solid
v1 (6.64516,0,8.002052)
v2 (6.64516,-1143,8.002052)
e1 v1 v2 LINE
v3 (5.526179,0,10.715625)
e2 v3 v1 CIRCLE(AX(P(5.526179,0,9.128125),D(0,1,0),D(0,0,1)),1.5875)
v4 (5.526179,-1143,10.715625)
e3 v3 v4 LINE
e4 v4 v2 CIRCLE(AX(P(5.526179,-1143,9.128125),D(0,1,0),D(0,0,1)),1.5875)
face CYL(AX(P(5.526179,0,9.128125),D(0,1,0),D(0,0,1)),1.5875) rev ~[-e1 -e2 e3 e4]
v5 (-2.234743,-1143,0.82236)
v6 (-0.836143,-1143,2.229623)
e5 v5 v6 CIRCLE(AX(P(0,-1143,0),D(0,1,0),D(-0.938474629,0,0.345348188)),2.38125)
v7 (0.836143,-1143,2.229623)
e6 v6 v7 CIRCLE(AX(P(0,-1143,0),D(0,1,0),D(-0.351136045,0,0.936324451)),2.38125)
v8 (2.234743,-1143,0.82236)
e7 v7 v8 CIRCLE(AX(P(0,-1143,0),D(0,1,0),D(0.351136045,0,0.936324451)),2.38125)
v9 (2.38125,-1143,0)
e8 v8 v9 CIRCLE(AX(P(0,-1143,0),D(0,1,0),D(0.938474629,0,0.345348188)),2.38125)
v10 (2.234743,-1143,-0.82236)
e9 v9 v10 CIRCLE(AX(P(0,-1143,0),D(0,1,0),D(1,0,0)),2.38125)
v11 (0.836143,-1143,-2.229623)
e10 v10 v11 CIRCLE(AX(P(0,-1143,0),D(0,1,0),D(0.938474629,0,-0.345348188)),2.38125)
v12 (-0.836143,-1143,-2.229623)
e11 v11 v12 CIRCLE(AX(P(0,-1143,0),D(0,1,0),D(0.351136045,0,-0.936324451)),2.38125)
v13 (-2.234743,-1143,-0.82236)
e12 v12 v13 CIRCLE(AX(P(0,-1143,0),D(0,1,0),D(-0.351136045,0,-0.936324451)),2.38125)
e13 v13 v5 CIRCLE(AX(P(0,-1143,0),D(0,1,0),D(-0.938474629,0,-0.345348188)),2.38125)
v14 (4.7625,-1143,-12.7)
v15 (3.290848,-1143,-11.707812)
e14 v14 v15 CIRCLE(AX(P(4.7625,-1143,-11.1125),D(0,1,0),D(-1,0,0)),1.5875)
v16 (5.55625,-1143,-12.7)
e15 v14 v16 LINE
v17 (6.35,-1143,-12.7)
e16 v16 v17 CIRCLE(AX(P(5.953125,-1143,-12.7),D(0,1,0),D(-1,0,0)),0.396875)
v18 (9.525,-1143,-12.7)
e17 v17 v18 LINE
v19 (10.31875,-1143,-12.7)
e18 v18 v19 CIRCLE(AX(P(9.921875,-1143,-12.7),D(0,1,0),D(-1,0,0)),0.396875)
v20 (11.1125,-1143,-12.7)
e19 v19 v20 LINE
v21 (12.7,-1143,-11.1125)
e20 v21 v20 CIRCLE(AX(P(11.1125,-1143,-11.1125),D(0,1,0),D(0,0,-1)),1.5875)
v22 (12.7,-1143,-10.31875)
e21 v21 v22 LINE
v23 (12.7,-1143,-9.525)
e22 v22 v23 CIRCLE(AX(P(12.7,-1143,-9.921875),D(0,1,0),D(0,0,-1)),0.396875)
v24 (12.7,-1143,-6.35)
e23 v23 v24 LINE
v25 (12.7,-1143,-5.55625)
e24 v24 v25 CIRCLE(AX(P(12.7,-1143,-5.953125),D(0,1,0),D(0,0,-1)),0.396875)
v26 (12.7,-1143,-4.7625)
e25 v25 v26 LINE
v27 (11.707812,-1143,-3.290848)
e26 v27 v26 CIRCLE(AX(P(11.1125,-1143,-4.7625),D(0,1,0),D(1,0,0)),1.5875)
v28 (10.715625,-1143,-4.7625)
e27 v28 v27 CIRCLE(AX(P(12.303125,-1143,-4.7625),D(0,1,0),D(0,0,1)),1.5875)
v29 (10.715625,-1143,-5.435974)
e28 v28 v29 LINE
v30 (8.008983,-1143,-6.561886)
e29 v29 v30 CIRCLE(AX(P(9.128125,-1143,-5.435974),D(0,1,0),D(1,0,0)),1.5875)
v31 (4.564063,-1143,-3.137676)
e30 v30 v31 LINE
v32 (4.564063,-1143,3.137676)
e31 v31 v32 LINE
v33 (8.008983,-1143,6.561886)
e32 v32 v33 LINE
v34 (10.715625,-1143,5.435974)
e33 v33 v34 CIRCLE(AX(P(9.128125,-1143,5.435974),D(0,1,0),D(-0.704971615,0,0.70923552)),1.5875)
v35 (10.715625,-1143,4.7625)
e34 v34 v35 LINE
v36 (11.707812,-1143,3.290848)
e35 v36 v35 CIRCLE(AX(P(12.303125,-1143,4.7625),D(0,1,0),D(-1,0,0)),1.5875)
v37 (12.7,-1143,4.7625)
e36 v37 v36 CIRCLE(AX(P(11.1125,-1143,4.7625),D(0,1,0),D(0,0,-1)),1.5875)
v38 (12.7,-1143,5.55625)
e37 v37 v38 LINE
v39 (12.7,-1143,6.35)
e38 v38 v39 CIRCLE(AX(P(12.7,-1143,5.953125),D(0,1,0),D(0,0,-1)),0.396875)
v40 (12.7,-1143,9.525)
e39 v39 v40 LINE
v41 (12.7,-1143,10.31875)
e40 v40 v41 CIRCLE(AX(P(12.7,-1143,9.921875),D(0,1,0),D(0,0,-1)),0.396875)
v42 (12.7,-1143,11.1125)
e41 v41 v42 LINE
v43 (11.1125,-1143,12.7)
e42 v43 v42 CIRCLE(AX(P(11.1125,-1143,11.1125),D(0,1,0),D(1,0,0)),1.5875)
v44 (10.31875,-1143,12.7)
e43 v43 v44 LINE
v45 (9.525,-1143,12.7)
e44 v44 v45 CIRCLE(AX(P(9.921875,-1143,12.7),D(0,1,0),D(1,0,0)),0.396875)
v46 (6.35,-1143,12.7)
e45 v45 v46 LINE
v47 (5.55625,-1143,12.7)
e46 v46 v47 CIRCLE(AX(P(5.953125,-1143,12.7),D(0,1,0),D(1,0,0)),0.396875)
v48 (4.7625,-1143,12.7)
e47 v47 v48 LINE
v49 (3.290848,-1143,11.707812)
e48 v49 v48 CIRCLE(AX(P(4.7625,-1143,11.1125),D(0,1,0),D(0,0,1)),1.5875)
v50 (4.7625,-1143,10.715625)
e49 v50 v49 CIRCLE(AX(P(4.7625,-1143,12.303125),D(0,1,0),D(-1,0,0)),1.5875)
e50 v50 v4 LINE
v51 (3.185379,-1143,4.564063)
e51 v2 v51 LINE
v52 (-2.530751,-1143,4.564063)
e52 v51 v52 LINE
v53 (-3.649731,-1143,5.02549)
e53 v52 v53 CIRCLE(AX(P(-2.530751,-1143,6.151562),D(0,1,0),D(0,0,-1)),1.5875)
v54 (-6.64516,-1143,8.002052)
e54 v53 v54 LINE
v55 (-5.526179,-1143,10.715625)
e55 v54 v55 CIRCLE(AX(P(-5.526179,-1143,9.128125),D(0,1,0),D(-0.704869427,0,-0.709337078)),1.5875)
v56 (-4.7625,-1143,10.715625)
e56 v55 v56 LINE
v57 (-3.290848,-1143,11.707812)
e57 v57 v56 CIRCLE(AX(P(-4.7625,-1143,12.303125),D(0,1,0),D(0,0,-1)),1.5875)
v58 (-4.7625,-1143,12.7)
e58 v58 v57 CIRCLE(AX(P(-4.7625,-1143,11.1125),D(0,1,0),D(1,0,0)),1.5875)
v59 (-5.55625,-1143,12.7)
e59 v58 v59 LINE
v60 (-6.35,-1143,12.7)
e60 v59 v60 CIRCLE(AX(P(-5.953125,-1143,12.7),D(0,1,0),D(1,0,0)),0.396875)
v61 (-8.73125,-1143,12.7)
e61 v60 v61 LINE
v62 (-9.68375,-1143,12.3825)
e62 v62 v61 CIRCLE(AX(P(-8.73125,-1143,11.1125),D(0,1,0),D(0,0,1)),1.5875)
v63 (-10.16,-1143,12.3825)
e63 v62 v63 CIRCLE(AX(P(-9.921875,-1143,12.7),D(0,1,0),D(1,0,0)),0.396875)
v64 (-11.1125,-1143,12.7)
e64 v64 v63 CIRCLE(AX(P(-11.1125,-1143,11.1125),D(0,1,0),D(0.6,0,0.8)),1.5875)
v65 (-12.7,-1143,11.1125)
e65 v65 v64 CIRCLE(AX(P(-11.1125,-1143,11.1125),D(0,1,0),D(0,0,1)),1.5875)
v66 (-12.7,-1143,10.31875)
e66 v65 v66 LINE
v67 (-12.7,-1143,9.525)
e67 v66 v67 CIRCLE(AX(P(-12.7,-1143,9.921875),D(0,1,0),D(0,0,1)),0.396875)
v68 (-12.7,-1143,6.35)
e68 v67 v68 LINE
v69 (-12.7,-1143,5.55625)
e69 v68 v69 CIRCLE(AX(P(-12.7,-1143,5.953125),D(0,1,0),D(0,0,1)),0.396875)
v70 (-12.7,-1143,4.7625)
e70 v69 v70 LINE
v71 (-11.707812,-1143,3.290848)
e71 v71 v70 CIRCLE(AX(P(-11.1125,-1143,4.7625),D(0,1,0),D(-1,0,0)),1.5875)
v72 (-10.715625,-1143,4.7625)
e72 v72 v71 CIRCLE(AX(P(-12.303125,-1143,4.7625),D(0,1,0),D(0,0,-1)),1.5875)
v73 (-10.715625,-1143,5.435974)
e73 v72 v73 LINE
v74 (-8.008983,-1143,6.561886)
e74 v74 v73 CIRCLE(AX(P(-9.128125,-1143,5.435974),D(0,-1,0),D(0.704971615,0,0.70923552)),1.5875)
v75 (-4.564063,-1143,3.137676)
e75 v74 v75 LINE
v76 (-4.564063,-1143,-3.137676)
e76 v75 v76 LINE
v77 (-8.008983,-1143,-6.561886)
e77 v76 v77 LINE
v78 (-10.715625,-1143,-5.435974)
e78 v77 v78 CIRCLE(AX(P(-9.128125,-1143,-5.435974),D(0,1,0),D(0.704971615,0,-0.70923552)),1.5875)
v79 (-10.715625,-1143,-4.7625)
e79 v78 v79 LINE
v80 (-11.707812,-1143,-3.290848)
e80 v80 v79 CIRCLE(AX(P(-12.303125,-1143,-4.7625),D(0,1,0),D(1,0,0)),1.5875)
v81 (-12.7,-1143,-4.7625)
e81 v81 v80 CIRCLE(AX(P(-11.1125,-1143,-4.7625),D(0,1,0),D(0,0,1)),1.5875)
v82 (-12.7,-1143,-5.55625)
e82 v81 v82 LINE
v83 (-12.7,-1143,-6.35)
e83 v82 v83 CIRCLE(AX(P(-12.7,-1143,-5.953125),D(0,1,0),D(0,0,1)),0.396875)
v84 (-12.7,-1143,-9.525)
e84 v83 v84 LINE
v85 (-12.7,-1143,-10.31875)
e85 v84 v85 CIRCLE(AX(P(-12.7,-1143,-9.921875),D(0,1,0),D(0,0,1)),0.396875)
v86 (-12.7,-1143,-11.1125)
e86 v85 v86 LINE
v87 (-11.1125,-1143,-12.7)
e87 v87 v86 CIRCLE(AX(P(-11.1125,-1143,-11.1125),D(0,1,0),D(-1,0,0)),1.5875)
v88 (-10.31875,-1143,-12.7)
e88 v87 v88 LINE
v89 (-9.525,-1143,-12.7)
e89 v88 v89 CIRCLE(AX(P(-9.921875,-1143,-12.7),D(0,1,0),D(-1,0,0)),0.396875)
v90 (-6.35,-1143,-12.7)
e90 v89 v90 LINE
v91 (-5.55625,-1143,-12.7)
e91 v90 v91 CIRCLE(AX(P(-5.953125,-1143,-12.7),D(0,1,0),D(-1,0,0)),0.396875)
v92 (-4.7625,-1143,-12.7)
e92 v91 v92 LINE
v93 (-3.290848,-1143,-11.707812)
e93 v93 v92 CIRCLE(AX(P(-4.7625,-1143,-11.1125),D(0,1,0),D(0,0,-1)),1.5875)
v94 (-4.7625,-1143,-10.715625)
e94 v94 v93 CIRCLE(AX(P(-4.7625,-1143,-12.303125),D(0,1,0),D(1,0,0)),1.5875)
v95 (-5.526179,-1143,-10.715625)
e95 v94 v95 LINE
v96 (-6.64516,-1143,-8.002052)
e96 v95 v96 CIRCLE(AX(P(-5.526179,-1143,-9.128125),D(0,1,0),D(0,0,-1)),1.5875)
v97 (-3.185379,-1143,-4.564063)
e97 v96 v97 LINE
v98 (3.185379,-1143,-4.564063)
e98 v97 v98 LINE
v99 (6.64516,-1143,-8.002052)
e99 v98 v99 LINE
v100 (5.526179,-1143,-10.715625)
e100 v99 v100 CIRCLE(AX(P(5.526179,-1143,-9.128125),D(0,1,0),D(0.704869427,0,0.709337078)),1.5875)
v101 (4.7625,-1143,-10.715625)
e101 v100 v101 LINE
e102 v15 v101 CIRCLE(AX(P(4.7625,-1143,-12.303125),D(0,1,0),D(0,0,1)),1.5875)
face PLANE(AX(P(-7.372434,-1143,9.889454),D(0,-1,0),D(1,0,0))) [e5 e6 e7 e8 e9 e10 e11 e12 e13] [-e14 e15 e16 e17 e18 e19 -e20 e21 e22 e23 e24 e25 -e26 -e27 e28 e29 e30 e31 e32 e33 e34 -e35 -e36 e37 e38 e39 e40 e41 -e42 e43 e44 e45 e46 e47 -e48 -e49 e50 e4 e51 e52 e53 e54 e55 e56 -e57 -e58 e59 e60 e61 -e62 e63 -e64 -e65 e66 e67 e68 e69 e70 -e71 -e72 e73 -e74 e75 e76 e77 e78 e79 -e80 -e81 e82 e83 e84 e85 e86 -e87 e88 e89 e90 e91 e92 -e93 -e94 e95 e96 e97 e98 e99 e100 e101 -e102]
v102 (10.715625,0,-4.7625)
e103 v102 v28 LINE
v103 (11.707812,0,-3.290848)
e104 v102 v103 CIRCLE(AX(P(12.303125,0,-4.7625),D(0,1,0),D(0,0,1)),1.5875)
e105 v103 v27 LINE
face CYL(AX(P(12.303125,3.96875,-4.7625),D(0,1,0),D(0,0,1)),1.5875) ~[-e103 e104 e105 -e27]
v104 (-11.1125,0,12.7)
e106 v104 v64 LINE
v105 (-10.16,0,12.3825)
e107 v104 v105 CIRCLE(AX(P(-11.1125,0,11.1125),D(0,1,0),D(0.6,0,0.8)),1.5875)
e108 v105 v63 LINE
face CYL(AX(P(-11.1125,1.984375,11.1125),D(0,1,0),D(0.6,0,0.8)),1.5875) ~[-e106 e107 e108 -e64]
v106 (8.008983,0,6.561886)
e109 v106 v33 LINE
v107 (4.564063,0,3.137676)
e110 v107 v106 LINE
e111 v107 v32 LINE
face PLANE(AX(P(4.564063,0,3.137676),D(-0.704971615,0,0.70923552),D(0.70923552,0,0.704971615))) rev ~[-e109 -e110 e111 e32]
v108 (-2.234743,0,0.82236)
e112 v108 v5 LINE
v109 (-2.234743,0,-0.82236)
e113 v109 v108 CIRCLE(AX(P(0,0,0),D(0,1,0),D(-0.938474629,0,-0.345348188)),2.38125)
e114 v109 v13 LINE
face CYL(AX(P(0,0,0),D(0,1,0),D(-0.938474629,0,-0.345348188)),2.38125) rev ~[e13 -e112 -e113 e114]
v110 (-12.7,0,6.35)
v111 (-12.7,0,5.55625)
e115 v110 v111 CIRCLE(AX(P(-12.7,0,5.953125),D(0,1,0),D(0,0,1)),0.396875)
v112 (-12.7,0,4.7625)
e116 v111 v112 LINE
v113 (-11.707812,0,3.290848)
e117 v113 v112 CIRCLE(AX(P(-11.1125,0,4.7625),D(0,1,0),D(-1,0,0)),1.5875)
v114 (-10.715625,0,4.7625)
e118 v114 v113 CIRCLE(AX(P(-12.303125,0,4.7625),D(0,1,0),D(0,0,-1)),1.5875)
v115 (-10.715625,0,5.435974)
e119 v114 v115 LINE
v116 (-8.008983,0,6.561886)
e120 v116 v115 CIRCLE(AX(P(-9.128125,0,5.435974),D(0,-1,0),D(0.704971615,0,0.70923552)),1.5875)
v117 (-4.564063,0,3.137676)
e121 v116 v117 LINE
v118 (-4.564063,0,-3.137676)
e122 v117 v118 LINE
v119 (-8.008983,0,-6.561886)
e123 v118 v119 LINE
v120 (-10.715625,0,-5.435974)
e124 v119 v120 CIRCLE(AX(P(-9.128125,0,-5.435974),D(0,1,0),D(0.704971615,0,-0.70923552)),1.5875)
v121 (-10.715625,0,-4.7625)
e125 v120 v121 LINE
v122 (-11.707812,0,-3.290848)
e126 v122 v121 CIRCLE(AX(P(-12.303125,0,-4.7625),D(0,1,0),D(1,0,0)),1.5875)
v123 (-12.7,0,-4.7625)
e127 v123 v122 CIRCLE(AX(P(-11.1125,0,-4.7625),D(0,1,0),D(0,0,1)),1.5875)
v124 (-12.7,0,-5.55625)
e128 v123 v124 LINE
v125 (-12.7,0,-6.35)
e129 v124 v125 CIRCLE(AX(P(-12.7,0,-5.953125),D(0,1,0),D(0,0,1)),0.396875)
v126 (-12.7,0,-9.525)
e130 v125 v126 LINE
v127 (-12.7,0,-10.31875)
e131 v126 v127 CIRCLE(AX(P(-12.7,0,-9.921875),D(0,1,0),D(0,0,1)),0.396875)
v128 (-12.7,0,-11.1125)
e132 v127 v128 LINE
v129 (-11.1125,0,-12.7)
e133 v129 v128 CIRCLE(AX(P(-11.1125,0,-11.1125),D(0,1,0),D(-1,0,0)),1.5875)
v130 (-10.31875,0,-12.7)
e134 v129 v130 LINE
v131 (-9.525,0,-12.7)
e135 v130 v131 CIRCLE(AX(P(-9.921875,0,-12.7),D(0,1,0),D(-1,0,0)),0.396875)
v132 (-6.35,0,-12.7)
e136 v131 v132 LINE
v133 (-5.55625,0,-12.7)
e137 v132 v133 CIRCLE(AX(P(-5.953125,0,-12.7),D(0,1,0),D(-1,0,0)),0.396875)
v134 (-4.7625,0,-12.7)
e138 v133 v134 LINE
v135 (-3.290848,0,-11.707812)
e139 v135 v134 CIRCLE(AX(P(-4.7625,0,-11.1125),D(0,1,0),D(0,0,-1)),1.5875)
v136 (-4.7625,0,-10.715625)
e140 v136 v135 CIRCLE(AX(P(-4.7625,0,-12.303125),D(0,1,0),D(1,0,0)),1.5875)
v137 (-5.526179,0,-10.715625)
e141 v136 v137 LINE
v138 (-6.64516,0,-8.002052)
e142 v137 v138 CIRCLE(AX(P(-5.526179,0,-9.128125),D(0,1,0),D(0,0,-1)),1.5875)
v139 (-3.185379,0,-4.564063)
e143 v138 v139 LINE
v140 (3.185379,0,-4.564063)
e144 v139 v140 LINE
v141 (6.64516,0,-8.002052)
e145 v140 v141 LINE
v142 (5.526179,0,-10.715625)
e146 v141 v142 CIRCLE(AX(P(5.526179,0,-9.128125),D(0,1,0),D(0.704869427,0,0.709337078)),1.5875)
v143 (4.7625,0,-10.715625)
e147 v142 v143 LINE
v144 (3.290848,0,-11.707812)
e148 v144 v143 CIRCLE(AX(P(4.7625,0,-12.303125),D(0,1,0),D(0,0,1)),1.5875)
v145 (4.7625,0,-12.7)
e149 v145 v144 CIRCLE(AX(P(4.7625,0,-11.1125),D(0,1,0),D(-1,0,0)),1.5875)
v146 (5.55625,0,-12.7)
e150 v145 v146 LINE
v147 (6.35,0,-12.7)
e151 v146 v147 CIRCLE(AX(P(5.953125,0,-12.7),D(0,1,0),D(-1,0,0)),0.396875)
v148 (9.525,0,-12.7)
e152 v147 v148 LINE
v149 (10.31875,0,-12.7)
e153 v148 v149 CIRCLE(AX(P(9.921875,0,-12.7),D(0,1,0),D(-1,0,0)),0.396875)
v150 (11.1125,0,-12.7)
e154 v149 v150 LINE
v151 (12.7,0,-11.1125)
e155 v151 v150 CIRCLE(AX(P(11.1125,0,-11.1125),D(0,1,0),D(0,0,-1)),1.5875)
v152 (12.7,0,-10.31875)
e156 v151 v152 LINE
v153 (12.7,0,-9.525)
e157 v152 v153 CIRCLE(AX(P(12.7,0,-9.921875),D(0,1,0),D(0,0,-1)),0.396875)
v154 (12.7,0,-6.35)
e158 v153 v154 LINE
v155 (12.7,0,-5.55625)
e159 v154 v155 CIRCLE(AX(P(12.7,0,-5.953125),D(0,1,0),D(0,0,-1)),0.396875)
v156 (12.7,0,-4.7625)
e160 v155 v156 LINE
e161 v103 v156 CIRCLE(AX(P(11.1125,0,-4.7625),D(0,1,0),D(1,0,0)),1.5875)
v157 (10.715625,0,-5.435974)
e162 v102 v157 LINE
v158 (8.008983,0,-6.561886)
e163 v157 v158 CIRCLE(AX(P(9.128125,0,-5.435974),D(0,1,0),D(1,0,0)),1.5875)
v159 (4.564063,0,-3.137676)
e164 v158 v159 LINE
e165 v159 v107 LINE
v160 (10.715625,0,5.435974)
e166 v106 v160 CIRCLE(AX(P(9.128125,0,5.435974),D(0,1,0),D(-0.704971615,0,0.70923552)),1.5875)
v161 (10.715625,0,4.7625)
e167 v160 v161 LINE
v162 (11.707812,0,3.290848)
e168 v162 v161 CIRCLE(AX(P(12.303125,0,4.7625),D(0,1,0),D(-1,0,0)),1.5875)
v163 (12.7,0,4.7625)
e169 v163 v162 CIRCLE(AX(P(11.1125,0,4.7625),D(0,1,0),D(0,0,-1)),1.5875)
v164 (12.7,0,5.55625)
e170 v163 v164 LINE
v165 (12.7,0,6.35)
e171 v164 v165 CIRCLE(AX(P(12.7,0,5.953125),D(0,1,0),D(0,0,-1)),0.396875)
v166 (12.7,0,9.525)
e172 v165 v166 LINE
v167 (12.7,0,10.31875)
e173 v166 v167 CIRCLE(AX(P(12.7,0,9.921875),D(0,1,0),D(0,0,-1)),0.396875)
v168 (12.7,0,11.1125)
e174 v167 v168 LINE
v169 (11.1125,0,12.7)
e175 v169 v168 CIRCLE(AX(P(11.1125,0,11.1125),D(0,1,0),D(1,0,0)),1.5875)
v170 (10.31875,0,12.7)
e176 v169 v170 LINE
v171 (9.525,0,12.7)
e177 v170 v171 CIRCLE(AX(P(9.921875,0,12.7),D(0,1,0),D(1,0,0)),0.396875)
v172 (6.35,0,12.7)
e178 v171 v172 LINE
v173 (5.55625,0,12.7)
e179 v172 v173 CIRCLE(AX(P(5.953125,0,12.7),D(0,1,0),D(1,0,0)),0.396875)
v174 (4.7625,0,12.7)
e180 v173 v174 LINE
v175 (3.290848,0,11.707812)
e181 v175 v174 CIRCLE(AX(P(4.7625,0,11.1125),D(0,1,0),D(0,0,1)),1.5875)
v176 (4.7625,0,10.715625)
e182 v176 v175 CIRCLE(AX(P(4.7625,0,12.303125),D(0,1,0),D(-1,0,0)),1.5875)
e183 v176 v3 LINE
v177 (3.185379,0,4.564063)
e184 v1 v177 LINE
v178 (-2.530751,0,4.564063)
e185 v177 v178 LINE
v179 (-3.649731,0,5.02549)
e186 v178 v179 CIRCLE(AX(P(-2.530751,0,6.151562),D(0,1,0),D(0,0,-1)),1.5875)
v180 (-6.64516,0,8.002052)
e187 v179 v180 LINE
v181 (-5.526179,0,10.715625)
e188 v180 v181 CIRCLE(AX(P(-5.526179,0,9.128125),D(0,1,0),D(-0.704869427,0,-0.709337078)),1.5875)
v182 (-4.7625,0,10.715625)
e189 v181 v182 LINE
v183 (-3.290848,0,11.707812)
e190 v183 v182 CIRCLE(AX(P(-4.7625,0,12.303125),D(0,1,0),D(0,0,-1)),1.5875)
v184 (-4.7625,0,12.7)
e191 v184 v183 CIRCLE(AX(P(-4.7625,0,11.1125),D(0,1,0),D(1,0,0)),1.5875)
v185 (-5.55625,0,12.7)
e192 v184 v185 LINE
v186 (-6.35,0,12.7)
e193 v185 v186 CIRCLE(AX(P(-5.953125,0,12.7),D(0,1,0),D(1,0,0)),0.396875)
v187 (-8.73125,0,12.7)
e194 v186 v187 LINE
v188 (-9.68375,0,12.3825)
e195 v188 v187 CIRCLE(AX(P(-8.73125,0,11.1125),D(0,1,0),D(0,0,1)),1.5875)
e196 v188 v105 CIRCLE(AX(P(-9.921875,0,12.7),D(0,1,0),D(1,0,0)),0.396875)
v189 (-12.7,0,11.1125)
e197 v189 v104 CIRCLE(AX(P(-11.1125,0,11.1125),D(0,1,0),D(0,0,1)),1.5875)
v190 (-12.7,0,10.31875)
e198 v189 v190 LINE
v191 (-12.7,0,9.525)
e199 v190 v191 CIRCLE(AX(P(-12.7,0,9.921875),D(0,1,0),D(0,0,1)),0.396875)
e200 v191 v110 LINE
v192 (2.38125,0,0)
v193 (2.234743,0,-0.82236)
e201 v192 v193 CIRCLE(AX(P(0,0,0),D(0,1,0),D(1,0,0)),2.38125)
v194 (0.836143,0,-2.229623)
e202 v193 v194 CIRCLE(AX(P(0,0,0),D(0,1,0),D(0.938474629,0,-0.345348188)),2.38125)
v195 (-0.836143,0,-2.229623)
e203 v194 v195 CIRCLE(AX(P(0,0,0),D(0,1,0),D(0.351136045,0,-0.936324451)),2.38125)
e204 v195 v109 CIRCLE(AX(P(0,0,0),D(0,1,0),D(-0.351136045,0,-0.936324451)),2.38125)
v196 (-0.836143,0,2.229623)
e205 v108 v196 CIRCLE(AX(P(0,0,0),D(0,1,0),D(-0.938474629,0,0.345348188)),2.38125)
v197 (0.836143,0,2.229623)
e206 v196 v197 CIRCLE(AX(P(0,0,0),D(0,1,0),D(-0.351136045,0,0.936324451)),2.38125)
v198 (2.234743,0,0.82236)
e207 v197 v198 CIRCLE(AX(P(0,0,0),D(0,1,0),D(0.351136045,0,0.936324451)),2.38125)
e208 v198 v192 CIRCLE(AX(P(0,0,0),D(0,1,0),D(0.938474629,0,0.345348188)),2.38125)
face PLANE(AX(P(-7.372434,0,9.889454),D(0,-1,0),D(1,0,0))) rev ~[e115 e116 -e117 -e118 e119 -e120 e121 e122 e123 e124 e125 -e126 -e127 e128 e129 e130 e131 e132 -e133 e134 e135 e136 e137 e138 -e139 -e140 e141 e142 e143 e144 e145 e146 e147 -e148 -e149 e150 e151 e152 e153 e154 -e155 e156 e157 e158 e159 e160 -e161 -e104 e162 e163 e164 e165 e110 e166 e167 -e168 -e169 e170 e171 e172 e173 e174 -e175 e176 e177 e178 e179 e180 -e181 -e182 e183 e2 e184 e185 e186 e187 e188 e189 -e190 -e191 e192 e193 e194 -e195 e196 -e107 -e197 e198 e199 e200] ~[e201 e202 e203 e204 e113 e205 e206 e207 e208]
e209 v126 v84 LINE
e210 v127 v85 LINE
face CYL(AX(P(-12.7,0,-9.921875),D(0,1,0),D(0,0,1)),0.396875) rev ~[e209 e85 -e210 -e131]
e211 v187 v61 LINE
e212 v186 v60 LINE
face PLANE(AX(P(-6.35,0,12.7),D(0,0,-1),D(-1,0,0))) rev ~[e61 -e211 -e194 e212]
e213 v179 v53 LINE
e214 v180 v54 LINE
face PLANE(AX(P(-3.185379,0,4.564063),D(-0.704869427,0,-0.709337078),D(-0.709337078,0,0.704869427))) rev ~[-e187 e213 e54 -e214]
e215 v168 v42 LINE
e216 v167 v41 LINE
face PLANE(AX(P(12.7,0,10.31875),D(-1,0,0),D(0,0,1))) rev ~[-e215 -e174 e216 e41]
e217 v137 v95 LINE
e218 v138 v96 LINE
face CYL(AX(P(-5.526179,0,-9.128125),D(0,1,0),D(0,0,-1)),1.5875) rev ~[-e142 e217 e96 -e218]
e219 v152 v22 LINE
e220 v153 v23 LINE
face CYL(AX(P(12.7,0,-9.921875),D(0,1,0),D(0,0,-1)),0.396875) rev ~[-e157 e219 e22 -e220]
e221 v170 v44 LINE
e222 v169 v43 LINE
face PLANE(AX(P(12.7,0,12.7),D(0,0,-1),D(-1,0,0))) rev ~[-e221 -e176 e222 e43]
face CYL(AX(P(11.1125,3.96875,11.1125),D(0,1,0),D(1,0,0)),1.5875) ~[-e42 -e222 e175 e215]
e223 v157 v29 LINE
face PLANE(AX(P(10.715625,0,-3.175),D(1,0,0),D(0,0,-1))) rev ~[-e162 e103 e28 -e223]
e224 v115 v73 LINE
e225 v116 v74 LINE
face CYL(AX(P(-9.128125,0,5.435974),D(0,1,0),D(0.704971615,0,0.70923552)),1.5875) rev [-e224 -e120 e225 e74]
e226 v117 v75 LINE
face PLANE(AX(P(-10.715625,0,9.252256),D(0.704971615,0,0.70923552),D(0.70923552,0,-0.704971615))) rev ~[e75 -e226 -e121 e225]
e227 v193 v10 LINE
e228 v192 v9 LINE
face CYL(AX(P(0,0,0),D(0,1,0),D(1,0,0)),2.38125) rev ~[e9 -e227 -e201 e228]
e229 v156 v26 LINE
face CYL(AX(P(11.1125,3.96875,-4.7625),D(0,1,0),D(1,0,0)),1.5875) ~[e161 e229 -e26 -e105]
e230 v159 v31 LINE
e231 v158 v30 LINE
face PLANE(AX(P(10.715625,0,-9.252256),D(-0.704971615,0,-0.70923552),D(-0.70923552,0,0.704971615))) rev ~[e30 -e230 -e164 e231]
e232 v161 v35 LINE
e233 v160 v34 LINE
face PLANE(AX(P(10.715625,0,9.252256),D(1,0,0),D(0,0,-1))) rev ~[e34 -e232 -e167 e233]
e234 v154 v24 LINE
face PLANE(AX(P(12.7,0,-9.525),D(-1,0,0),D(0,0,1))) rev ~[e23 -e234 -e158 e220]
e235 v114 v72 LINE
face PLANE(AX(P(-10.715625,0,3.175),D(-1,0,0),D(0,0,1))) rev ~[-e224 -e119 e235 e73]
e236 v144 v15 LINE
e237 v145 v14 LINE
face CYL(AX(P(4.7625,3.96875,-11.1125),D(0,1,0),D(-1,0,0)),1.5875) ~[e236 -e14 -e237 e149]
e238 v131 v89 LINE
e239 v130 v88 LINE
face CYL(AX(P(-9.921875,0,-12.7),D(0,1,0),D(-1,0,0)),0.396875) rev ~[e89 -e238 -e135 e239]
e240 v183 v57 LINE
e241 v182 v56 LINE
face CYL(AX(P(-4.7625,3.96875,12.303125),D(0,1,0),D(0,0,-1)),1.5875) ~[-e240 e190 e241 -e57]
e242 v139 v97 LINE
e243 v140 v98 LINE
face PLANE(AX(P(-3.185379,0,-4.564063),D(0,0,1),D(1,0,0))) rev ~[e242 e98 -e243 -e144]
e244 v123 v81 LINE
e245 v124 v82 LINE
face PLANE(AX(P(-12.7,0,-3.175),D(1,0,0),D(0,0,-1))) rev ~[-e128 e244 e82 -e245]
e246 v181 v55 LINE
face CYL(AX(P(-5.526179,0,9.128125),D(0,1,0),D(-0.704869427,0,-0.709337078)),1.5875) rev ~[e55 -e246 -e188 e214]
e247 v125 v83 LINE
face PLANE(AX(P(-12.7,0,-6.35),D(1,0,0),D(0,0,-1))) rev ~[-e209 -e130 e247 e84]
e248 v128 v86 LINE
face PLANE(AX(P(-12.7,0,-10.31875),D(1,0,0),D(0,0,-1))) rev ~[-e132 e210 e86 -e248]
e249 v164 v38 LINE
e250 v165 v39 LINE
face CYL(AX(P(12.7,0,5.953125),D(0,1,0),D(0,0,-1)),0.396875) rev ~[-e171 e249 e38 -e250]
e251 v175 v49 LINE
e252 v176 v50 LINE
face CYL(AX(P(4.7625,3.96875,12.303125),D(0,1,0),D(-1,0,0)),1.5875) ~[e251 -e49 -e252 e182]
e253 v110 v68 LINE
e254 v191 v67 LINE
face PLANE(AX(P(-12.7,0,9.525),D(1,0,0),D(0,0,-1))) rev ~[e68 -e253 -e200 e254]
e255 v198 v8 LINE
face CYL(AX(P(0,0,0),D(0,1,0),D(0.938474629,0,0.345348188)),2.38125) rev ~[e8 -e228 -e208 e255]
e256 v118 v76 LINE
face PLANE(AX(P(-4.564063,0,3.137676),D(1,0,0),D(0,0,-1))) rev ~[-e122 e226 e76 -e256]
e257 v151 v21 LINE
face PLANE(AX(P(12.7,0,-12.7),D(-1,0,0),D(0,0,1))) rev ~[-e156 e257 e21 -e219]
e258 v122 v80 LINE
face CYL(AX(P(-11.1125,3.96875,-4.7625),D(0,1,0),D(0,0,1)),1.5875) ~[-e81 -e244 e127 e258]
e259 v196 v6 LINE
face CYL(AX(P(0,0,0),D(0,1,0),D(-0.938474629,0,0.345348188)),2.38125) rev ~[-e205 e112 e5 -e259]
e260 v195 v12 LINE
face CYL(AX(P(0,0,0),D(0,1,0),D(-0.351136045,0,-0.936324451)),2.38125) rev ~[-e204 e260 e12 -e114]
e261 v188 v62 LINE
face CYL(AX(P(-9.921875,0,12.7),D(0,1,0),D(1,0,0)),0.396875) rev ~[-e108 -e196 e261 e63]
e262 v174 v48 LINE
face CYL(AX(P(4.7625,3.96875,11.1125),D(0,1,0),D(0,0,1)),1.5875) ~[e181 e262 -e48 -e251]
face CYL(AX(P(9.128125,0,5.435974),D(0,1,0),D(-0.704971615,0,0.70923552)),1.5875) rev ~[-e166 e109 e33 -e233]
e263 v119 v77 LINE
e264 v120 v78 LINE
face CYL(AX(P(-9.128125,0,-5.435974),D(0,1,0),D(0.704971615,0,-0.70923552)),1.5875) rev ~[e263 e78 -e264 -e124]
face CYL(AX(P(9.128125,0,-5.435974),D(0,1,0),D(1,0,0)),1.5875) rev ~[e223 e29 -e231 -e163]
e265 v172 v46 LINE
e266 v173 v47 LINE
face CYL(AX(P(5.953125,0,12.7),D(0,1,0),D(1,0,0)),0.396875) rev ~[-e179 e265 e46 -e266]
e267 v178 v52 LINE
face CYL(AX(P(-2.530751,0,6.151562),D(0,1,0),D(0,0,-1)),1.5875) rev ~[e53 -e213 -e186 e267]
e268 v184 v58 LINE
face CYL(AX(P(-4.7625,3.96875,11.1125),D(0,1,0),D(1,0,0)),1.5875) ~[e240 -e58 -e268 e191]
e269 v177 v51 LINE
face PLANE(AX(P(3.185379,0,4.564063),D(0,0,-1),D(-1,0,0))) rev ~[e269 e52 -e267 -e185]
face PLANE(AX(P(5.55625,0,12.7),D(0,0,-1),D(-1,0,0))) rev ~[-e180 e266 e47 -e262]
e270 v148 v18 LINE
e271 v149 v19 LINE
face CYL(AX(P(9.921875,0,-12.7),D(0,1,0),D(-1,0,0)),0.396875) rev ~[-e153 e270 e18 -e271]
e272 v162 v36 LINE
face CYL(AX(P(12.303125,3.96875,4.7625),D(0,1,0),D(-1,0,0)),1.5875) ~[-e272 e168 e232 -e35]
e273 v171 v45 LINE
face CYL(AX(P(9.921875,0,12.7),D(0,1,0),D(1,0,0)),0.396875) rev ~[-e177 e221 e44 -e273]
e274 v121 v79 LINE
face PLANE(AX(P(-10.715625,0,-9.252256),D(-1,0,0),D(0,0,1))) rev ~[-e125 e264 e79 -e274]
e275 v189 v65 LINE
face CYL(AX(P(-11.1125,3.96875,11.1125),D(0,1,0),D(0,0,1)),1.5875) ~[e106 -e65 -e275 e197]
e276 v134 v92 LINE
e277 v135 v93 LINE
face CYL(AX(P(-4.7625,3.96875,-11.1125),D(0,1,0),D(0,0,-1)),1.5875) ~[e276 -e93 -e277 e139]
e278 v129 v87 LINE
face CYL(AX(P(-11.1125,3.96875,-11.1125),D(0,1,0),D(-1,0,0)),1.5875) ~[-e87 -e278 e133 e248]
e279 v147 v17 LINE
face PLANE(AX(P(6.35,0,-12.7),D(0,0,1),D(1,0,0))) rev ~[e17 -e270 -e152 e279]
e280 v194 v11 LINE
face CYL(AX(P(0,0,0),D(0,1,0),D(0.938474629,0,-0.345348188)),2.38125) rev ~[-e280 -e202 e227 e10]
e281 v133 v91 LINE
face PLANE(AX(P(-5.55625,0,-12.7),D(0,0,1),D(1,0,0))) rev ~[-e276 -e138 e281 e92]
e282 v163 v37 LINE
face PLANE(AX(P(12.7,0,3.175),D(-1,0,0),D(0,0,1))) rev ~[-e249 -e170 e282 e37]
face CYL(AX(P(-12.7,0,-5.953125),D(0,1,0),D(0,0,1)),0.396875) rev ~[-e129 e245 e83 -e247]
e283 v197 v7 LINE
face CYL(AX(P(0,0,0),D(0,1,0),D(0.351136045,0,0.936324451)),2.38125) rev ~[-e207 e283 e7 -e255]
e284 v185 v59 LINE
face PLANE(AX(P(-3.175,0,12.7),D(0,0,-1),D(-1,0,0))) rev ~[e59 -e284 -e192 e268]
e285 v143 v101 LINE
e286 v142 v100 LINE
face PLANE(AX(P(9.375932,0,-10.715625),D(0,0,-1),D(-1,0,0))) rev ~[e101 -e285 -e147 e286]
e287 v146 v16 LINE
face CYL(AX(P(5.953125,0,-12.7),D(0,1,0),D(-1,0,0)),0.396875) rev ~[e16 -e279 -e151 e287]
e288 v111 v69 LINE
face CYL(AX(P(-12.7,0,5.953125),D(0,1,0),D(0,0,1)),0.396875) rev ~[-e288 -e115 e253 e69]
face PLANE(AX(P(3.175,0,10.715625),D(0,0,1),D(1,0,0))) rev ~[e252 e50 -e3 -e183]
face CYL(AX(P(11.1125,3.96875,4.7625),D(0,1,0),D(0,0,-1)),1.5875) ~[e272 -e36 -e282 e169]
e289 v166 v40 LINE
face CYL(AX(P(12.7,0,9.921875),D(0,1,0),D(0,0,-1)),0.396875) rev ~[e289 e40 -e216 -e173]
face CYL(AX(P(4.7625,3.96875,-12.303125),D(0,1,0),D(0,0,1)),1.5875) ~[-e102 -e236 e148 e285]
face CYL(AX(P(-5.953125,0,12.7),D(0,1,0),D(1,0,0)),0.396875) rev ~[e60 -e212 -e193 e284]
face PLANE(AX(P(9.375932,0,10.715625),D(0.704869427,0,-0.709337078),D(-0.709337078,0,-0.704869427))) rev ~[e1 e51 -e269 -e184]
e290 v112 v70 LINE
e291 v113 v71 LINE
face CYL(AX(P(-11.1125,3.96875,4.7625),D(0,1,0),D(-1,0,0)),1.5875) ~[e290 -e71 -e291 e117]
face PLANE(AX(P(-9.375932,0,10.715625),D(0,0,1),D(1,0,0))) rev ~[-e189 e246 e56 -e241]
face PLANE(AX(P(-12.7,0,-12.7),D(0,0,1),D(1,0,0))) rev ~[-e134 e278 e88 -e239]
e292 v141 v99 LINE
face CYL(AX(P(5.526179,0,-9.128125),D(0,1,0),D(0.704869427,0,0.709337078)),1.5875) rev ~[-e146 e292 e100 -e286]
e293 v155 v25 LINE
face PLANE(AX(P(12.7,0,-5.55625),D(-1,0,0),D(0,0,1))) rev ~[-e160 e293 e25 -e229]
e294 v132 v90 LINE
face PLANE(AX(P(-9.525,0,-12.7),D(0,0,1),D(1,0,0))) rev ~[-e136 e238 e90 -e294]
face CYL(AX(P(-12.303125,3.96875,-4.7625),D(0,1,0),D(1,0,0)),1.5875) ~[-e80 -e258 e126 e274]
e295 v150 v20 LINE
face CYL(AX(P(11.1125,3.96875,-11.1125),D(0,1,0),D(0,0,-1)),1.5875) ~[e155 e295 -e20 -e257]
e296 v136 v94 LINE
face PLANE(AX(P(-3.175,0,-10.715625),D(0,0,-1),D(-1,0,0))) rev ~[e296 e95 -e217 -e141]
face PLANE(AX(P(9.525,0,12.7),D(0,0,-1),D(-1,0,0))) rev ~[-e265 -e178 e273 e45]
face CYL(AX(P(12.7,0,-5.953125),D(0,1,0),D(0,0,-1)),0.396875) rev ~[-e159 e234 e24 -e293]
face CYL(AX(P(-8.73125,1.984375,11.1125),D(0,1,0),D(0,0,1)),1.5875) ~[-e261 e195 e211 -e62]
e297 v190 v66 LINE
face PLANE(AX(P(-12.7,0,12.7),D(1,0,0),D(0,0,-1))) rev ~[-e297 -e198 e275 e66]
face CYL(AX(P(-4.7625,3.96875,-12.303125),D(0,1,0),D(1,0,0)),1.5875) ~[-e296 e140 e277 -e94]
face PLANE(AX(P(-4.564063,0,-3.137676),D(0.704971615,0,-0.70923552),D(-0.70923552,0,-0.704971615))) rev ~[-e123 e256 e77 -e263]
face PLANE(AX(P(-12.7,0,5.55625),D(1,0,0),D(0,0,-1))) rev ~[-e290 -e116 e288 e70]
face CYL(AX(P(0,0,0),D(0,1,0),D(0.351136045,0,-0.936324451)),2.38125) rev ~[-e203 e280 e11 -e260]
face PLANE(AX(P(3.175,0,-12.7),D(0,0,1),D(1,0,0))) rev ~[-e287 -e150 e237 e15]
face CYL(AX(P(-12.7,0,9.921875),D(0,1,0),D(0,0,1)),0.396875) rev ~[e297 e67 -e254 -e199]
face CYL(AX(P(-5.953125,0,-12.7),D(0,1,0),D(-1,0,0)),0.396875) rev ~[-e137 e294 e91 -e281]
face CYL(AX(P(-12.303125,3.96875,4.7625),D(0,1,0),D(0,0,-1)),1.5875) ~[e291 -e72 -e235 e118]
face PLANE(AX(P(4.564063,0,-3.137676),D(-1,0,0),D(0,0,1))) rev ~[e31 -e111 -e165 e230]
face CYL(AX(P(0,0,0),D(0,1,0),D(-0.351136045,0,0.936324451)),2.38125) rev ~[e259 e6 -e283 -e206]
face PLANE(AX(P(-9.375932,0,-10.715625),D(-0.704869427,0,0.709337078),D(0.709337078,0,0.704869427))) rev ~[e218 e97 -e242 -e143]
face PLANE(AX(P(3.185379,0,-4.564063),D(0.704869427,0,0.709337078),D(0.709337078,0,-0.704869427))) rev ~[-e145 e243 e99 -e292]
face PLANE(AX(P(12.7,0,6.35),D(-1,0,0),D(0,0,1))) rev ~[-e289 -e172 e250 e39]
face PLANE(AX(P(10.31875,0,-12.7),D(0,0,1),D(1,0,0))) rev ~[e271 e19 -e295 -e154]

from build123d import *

# Parameters (mm, degrees)
F1_DEPTH    = 1143
F2_T1_DEPTH = 1143
F2_T3_DEPTH = 1150.9375
F2_T5_DEPTH = 1146.96875


# Not quite as in the source:
# - a fillet or chamfer that OpenCascade refuses, or shapes differently, is made with other operations: its cross-section is extruded or revolved along the edge and cut away or added


with BuildPart() as f1:
    # F0 (on Front) → F1 (new body)
    with BuildSketch(Plane.XZ):
        with BuildLine():
            ThreePointArc((-0.8361427067, 2.2296225996), (0, 2.38125), (0.8361427067, 2.2296225996))
            Line((0.8361427067, 2.2296225996), (3.1853789104, 4.5640625))
            Line((3.1853789104, 4.5640625), (-3.1853789104, 4.5640625))
            Line((-3.1853789104, 4.5640625), (-0.8361427067, 2.2296225996))
        make_face()
        with BuildLine():
            ThreePointArc((-2.2347427098, 0.8223603732), (-1.6889881746, 1.6785918231), (-0.8361427067, 2.2296225996))
            Line((-0.8361427067, 2.2296225996), (-3.1853789104, 4.5640625))
            Line((-3.1853789104, 4.5640625), (-4.5640625, 4.5640625))
            Line((-4.5640625, 4.5640625), (-4.5640625, 3.1376763557))
            Line((-4.5640625, 3.1376763557), (-2.2347427098, 0.8223603732))
        make_face()
        with BuildLine():
            ThreePointArc((-2.2347427098, -0.8223603732), (-2.38125, 0), (-2.2347427098, 0.8223603732))
            Line((-2.2347427098, 0.8223603732), (-4.5640625, 3.1376763557))
            Line((-4.5640625, 3.1376763557), (-4.5640625, -3.1376763557))
            Line((-4.5640625, -3.1376763557), (-2.2347427098, -0.8223603732))
        make_face()
        with BuildLine():
            Line((-3.1853789104, -4.5640625), (-0.8361427067, -2.2296225996))
            ThreePointArc((-0.8361427067, -2.2296225996), (-1.6889881746, -1.6785918231), (-2.2347427098, -0.8223603732))
            Line((-2.2347427098, -0.8223603732), (-4.5640625, -3.1376763557))
            Line((-4.5640625, -3.1376763557), (-4.5640625, -4.5640625))
            Line((-4.5640625, -4.5640625), (-3.1853789104, -4.5640625))
        make_face()
        with BuildLine():
            Line((3.1853789104, -4.5640625), (0.8361427067, -2.2296225996))
            ThreePointArc((0.8361427067, -2.2296225996), (0, -2.38125), (-0.8361427067, -2.2296225996))
            Line((-0.8361427067, -2.2296225996), (-3.1853789104, -4.5640625))
            Line((-3.1853789104, -4.5640625), (3.1853789104, -4.5640625))
        make_face()
        with BuildLine():
            Line((4.5640625, -3.1376763557), (2.2347427098, -0.8223603732))
            ThreePointArc((2.2347427098, -0.8223603732), (1.6889881746, -1.6785918231), (0.8361427067, -2.2296225996))
            Line((0.8361427067, -2.2296225996), (3.1853789104, -4.5640625))
            Line((3.1853789104, -4.5640625), (4.5640625, -4.5640625))
            Line((4.5640625, -4.5640625), (4.5640625, -3.1376763557))
        make_face()
        with BuildLine():
            ThreePointArc((2.2347427098, 0.8223603732), (2.3443370748, 0.4176544533), (2.38125, 0))
            ThreePointArc((2.38125, 0), (2.3443370748, -0.4176544533), (2.2347427098, -0.8223603732))
            Line((2.2347427098, -0.8223603732), (4.5640625, -3.1376763557))
            Line((4.5640625, -3.1376763557), (4.5640625, 3.1376763557))
            Line((4.5640625, 3.1376763557), (2.2347427098, 0.8223603732))
        make_face()
        with BuildLine():
            ThreePointArc((0.8361427067, 2.2296225996), (1.6889881746, 1.6785918231), (2.2347427098, 0.8223603732))
            Line((2.2347427098, 0.8223603732), (4.5640625, 3.1376763557))
            Line((4.5640625, 3.1376763557), (4.5640625, 4.5640625))
            Line((4.5640625, 4.5640625), (3.1853789104, 4.5640625))
            Line((3.1853789104, 4.5640625), (0.8361427067, 2.2296225996))
        make_face()
        Polygon((4.5640625, 4.5640625), (4.5640625, 3.1376763557), (10.715625, 9.2522558281), (12.7, 11.2247008192), (12.7, 12.7), (11.3728841543, 12.7), (9.3759316558, 10.715625), (3.1853789104, 4.5640625), align=None)
        with BuildLine():
            Line((12.7, 11.2247008192), (10.715625, 9.2522558281))
            Line((10.715625, 9.2522558281), (10.715625, 7.14375))
            Line((10.715625, 7.14375), (10.715625, 3.175))
            Line((10.715625, 3.175), (12.7, 3.175))
            Line((12.7, 3.175), (12.7, 5.55625))
            ThreePointArc((12.7, 5.55625), (12.303125, 5.953125), (12.7, 6.35))
            Line((12.7, 6.35), (12.7, 9.525))
            ThreePointArc((12.7, 9.525), (12.303125, 9.921875), (12.7, 10.31875))
            Line((12.7, 10.31875), (12.7, 11.2247008192))
        make_face()
        with BuildLine():
            Line((7.14375, 10.715625), (9.3759316558, 10.715625))
            Line((9.3759316558, 10.715625), (11.3728841543, 12.7))
            Line((11.3728841543, 12.7), (10.31875, 12.7))
            ThreePointArc((10.31875, 12.7), (9.921875, 12.303125), (9.525, 12.7))
            Line((9.525, 12.7), (6.35, 12.7))
            ThreePointArc((6.35, 12.7), (5.953125, 12.303125), (5.55625, 12.7))
            Line((5.55625, 12.7), (3.175, 12.7))
            Line((3.175, 12.7), (3.175, 10.715625))
            Line((3.175, 10.715625), (7.14375, 10.715625))
        make_face()
        with BuildLine():
            Line((-11.3728841543, 12.7), (-9.3759316558, 10.715625))
            Line((-9.3759316558, 10.715625), (-7.14375, 10.715625))
            Line((-7.14375, 10.715625), (-3.175, 10.715625))
            Line((-3.175, 10.715625), (-3.175, 12.7))
            Line((-3.175, 12.7), (-5.55625, 12.7))
            ThreePointArc((-5.55625, 12.7), (-5.953125, 12.303125), (-6.35, 12.7))
            Line((-6.35, 12.7), (-7.14375, 12.7))
            Line((-7.14375, 12.7), (-9.525, 12.7))
            ThreePointArc((-9.525, 12.7), (-9.921875, 12.303125), (-10.31875, 12.7))
            Line((-10.31875, 12.7), (-11.3728841543, 12.7))
        make_face()
        Polygon((-4.5640625, 4.5640625), (-3.1853789104, 4.5640625), (-9.3759316558, 10.715625), (-11.3728841543, 12.7), (-12.7, 11.2247008192), (-10.715625, 9.2522558281), (-4.5640625, 3.1376763557), align=None)
        Polygon((-12.7, 11.2247008192), (-11.3728841543, 12.7), (-12.7, 12.7), align=None)
        with BuildLine():
            Line((-10.715625, 7.14375), (-10.715625, 9.2522558281))
            Line((-10.715625, 9.2522558281), (-12.7, 11.2247008192))
            Line((-12.7, 11.2247008192), (-12.7, 10.31875))
            ThreePointArc((-12.7, 10.31875), (-12.303125, 9.921875), (-12.7, 9.525))
            Line((-12.7, 9.525), (-12.7, 6.35))
            ThreePointArc((-12.7, 6.35), (-12.303125, 5.953125), (-12.7, 5.55625))
            Line((-12.7, 5.55625), (-12.7, 3.175))
            Line((-12.7, 3.175), (-10.715625, 3.175))
            Line((-10.715625, 3.175), (-10.715625, 7.14375))
        make_face()
        with BuildLine():
            Line((-12.7, -11.2247008192), (-10.715625, -9.2522558281))
            Line((-10.715625, -9.2522558281), (-10.715625, -7.14375))
            Line((-10.715625, -7.14375), (-10.715625, -3.175))
            Line((-10.715625, -3.175), (-12.7, -3.175))
            Line((-12.7, -3.175), (-12.7, -5.55625))
            ThreePointArc((-12.7, -5.55625), (-12.303125, -5.953125), (-12.7, -6.35))
            Line((-12.7, -6.35), (-12.7, -9.525))
            ThreePointArc((-12.7, -9.525), (-12.303125, -9.921875), (-12.7, -10.31875))
            Line((-12.7, -10.31875), (-12.7, -11.2247008192))
        make_face()
        Polygon((-9.3759316558, -10.715625), (-3.1853789104, -4.5640625), (-4.5640625, -4.5640625), (-4.5640625, -3.1376763557), (-10.715625, -9.2522558281), (-12.7, -11.2247008192), (-12.7, -12.7), (-11.3728841543, -12.7), align=None)
        with BuildLine():
            Line((-7.14375, -10.715625), (-9.3759316558, -10.715625))
            Line((-9.3759316558, -10.715625), (-11.3728841543, -12.7))
            Line((-11.3728841543, -12.7), (-10.31875, -12.7))
            ThreePointArc((-10.31875, -12.7), (-9.921875, -12.303125), (-9.525, -12.7))
            Line((-9.525, -12.7), (-6.35, -12.7))
            ThreePointArc((-6.35, -12.7), (-5.953125, -12.303125), (-5.55625, -12.7))
            Line((-5.55625, -12.7), (-3.175, -12.7))
            Line((-3.175, -12.7), (-3.175, -10.715625))
            Line((-3.175, -10.715625), (-7.14375, -10.715625))
        make_face()
        with BuildLine():
            Line((11.3728841543, -12.7), (9.3759316558, -10.715625))
            Line((9.3759316558, -10.715625), (7.14375, -10.715625))
            Line((7.14375, -10.715625), (3.175, -10.715625))
            Line((3.175, -10.715625), (3.175, -12.7))
            Line((3.175, -12.7), (5.55625, -12.7))
            ThreePointArc((5.55625, -12.7), (5.953125, -12.303125), (6.35, -12.7))
            Line((6.35, -12.7), (9.525, -12.7))
            ThreePointArc((9.525, -12.7), (9.921875, -12.303125), (10.31875, -12.7))
            Line((10.31875, -12.7), (11.3728841543, -12.7))
        make_face()
        Polygon((10.715625, -9.2522558281), (4.5640625, -3.1376763557), (4.5640625, -4.5640625), (3.1853789104, -4.5640625), (9.3759316558, -10.715625), (11.3728841543, -12.7), (12.7, -12.7), (12.7, -11.2247008192), align=None)
        with BuildLine():
            Line((10.715625, -7.14375), (10.715625, -9.2522558281))
            Line((10.715625, -9.2522558281), (12.7, -11.2247008192))
            Line((12.7, -11.2247008192), (12.7, -10.31875))
            ThreePointArc((12.7, -10.31875), (12.303125, -9.921875), (12.7, -9.525))
            Line((12.7, -9.525), (12.7, -6.35))
            ThreePointArc((12.7, -6.35), (12.303125, -5.953125), (12.7, -5.55625))
            Line((12.7, -5.55625), (12.7, -3.175))
            Line((12.7, -3.175), (10.715625, -3.175))
            Line((10.715625, -3.175), (10.715625, -7.14375))
        make_face()
    extrude(amount=F1_DEPTH)

    # F2: fillet of radius 1.5875 on 31 edges, made by hand

    # F2_s2 → F2_t1 (join)
    with BuildSketch(Plane.XZ):
        with BuildLine():
            ThreePointArc((-6.6451596968, 8.0020523886), (-6.9937960043, 9.7333175229), (-5.5261794807, 10.715625))
            Line((-5.5261794807, 10.715625), (-9.3759316558, 10.715625))
            Line((-9.3759316558, 10.715625), (-6.6451596968, 8.0020523886))
        make_face()
        with BuildLine():
            ThreePointArc((-8.0089825615, 6.5618856508), (-9.7378452755, 6.9017155215), (-10.715625, 5.4359742634))
            Line((-10.715625, 5.4359742634), (-10.715625, 9.2522558281))
            Line((-10.715625, 9.2522558281), (-8.0089825615, 6.5618856508))
        make_face()
        with BuildLine():
            ThreePointArc((5.5261794807, 10.715625), (6.9937960043, 9.7333175229), (6.6451596968, 8.0020523886))
            Line((6.6451596968, 8.0020523886), (9.3759316558, 10.715625))
            Line((9.3759316558, 10.715625), (5.5261794807, 10.715625))
        make_face()
        with BuildLine():
            ThreePointArc((8.0089825615, 6.5618856508), (9.7378452755, 6.9017155215), (10.715625, 5.4359742634))
            Line((10.715625, 5.4359742634), (10.715625, 9.2522558281))
            Line((10.715625, 9.2522558281), (8.0089825615, 6.5618856508))
        make_face()
        with BuildLine():
            ThreePointArc((10.715625, -5.4359742634), (9.7378452755, -6.9017155215), (8.0089825615, -6.5618856508))
            Line((8.0089825615, -6.5618856508), (10.715625, -9.2522558281))
            Line((10.715625, -9.2522558281), (10.715625, -5.4359742634))
        make_face()
        with BuildLine():
            ThreePointArc((6.6451596968, -8.0020523886), (6.9937960043, -9.7333175229), (5.5261794807, -10.715625))
            Line((5.5261794807, -10.715625), (9.3759316558, -10.715625))
            Line((9.3759316558, -10.715625), (6.6451596968, -8.0020523886))
        make_face()
        with BuildLine():
            ThreePointArc((-5.5261794807, -10.715625), (-6.9937960043, -9.7333175229), (-6.6451596968, -8.0020523886))
            Line((-6.6451596968, -8.0020523886), (-9.3759316558, -10.715625))
            Line((-9.3759316558, -10.715625), (-5.5261794807, -10.715625))
        make_face()
        with BuildLine():
            ThreePointArc((-8.0089825615, -6.5618856508), (-9.7378452755, -6.9017155215), (-10.715625, -5.4359742634))
            Line((-10.715625, -5.4359742634), (-10.715625, -9.2522558281))
            Line((-10.715625, -9.2522558281), (-8.0089825615, -6.5618856508))
        make_face()
        with BuildLine():
            ThreePointArc((-2.530750733, 4.5640625), (-3.1359432558, 4.6839459764), (-3.649730949, 5.0254898886))
            Line((-3.649730949, 5.0254898886), (-3.1853789104, 4.5640625))
            Line((-3.1853789104, 4.5640625), (-2.530750733, 4.5640625))
        make_face()
    extrude(amount=F2_T1_DEPTH)

    # F2_s4 → F2_t3 (cut)
    with BuildSketch(Plane.XZ.offset(-3.96875)):
        with BuildLine():
            ThreePointArc((-12.7, -11.1125), (-12.2350320151, -12.2350320151), (-11.1125, -12.7))
            Line((-11.1125, -12.7), (-12.7, -12.7))
            Line((-12.7, -12.7), (-12.7, -11.1125))
        make_face()
        with BuildLine():
            ThreePointArc((11.1125, -12.7), (12.2350320151, -12.2350320151), (12.7, -11.1125))
            Line((12.7, -11.1125), (12.7, -12.7))
            Line((12.7, -12.7), (11.1125, -12.7))
        make_face()
        with BuildLine():
            ThreePointArc((12.7, 11.1125), (12.2350320151, 12.2350320151), (11.1125, 12.7))
            Line((11.1125, 12.7), (12.7, 12.7))
            Line((12.7, 12.7), (12.7, 11.1125))
        make_face()
        with BuildLine():
            ThreePointArc((-12.7, 4.7625), (-12.2350320151, 3.6399679849), (-11.1125, 3.175))
            Line((-11.1125, 3.175), (-12.7, 3.175))
            Line((-12.7, 3.175), (-12.7, 4.7625))
        make_face()
        with BuildLine():
            ThreePointArc((-11.1125, -3.175), (-12.2350320151, -3.6399679849), (-12.7, -4.7625))
            Line((-12.7, -4.7625), (-12.7, -3.175))
            Line((-12.7, -3.175), (-11.1125, -3.175))
        make_face()
        with BuildLine():
            ThreePointArc((-12.303125, 3.175), (-11.1805929849, 3.6399679849), (-10.715625, 4.7625))
            Line((-10.715625, 4.7625), (-10.715625, 3.175))
            Line((-10.715625, 3.175), (-12.303125, 3.175))
        make_face()
        with BuildLine():
            ThreePointArc((-10.715625, -4.7625), (-11.1805929849, -3.6399679849), (-12.303125, -3.175))
            Line((-12.303125, -3.175), (-10.715625, -3.175))
            Line((-10.715625, -3.175), (-10.715625, -4.7625))
        make_face()
        with BuildLine():
            ThreePointArc((-3.175, -12.303125), (-3.6399679849, -11.1805929849), (-4.7625, -10.715625))
            Line((-4.7625, -10.715625), (-3.175, -10.715625))
            Line((-3.175, -10.715625), (-3.175, -12.303125))
        make_face()
        with BuildLine():
            ThreePointArc((-4.7625, -12.7), (-3.6399679849, -12.2350320151), (-3.175, -11.1125))
            Line((-3.175, -11.1125), (-3.175, -12.7))
            Line((-3.175, -12.7), (-4.7625, -12.7))
        make_face()
        with BuildLine():
            ThreePointArc((3.175, -11.1125), (3.6399679849, -12.2350320151), (4.7625, -12.7))
            Line((4.7625, -12.7), (3.175, -12.7))
            Line((3.175, -12.7), (3.175, -11.1125))
        make_face()
        with BuildLine():
            ThreePointArc((4.7625, -10.715625), (3.6399679849, -11.1805929849), (3.175, -12.303125))
            Line((3.175, -12.303125), (3.175, -10.715625))
            Line((3.175, -10.715625), (4.7625, -10.715625))
        make_face()
        with BuildLine():
            ThreePointArc((12.7, -4.7625), (12.2350320151, -3.6399679849), (11.1125, -3.175))
            Line((11.1125, -3.175), (12.7, -3.175))
            Line((12.7, -3.175), (12.7, -4.7625))
        make_face()
        with BuildLine():
            ThreePointArc((11.1125, 3.175), (12.2350320151, 3.6399679849), (12.7, 4.7625))
            Line((12.7, 4.7625), (12.7, 3.175))
            Line((12.7, 3.175), (11.1125, 3.175))
        make_face()
        with BuildLine():
            ThreePointArc((12.303125, -3.175), (11.1805929849, -3.6399679849), (10.715625, -4.7625))
            Line((10.715625, -4.7625), (10.715625, -3.175))
            Line((10.715625, -3.175), (12.303125, -3.175))
        make_face()
        with BuildLine():
            ThreePointArc((10.715625, 4.7625), (11.1805929849, 3.6399679849), (12.303125, 3.175))
            Line((12.303125, 3.175), (10.715625, 3.175))
            Line((10.715625, 3.175), (10.715625, 4.7625))
        make_face()
        with BuildLine():
            ThreePointArc((-4.7625, 10.715625), (-3.6399679849, 11.1805929849), (-3.175, 12.303125))
            Line((-3.175, 12.303125), (-3.175, 10.715625))
            Line((-3.175, 10.715625), (-4.7625, 10.715625))
        make_face()
        with BuildLine():
            ThreePointArc((-3.175, 11.1125), (-3.6399679849, 12.2350320151), (-4.7625, 12.7))
            Line((-4.7625, 12.7), (-3.175, 12.7))
            Line((-3.175, 12.7), (-3.175, 11.1125))
        make_face()
        with BuildLine():
            ThreePointArc((4.7625, 12.7), (3.6399679849, 12.2350320151), (3.175, 11.1125))
            Line((3.175, 11.1125), (3.175, 12.7))
            Line((3.175, 12.7), (4.7625, 12.7))
        make_face()
        with BuildLine():
            ThreePointArc((3.175, 12.303125), (3.6399679849, 11.1805929849), (4.7625, 10.715625))
            Line((4.7625, 10.715625), (3.175, 10.715625))
            Line((3.175, 10.715625), (3.175, 12.303125))
        make_face()
        with BuildLine():
            ThreePointArc((-11.1125, 12.7), (-12.2350320151, 12.2350320151), (-12.7, 11.1125))
            Line((-12.7, 11.1125), (-12.7, 12.7))
            Line((-12.7, 12.7), (-11.1125, 12.7))
        make_face()
    extrude(amount=F2_T3_DEPTH, mode=Mode.SUBTRACT)

    # F2_s6 → F2_t5 (cut)
    with BuildSketch(Plane.XZ.offset(-1.984375)):
        with BuildLine():
            ThreePointArc((-8.73125, 12.7), (-9.2332615786, 12.6185347357), (-9.68375, 12.3825))
            ThreePointArc((-9.68375, 12.3825), (-9.5668992086, 12.5225121043), (-9.525, 12.7))
            Line((-9.525, 12.7), (-8.73125, 12.7))
        make_face()
        with BuildLine():
            ThreePointArc((-10.16, 12.3825), (-10.6104884214, 12.6185347357), (-11.1125, 12.7))
            Line((-11.1125, 12.7), (-10.31875, 12.7))
            ThreePointArc((-10.31875, 12.7), (-10.2768507914, 12.5225121043), (-10.16, 12.3825))
        make_face()
    extrude(amount=F2_T5_DEPTH, mode=Mode.SUBTRACT)


solid = f1.part
